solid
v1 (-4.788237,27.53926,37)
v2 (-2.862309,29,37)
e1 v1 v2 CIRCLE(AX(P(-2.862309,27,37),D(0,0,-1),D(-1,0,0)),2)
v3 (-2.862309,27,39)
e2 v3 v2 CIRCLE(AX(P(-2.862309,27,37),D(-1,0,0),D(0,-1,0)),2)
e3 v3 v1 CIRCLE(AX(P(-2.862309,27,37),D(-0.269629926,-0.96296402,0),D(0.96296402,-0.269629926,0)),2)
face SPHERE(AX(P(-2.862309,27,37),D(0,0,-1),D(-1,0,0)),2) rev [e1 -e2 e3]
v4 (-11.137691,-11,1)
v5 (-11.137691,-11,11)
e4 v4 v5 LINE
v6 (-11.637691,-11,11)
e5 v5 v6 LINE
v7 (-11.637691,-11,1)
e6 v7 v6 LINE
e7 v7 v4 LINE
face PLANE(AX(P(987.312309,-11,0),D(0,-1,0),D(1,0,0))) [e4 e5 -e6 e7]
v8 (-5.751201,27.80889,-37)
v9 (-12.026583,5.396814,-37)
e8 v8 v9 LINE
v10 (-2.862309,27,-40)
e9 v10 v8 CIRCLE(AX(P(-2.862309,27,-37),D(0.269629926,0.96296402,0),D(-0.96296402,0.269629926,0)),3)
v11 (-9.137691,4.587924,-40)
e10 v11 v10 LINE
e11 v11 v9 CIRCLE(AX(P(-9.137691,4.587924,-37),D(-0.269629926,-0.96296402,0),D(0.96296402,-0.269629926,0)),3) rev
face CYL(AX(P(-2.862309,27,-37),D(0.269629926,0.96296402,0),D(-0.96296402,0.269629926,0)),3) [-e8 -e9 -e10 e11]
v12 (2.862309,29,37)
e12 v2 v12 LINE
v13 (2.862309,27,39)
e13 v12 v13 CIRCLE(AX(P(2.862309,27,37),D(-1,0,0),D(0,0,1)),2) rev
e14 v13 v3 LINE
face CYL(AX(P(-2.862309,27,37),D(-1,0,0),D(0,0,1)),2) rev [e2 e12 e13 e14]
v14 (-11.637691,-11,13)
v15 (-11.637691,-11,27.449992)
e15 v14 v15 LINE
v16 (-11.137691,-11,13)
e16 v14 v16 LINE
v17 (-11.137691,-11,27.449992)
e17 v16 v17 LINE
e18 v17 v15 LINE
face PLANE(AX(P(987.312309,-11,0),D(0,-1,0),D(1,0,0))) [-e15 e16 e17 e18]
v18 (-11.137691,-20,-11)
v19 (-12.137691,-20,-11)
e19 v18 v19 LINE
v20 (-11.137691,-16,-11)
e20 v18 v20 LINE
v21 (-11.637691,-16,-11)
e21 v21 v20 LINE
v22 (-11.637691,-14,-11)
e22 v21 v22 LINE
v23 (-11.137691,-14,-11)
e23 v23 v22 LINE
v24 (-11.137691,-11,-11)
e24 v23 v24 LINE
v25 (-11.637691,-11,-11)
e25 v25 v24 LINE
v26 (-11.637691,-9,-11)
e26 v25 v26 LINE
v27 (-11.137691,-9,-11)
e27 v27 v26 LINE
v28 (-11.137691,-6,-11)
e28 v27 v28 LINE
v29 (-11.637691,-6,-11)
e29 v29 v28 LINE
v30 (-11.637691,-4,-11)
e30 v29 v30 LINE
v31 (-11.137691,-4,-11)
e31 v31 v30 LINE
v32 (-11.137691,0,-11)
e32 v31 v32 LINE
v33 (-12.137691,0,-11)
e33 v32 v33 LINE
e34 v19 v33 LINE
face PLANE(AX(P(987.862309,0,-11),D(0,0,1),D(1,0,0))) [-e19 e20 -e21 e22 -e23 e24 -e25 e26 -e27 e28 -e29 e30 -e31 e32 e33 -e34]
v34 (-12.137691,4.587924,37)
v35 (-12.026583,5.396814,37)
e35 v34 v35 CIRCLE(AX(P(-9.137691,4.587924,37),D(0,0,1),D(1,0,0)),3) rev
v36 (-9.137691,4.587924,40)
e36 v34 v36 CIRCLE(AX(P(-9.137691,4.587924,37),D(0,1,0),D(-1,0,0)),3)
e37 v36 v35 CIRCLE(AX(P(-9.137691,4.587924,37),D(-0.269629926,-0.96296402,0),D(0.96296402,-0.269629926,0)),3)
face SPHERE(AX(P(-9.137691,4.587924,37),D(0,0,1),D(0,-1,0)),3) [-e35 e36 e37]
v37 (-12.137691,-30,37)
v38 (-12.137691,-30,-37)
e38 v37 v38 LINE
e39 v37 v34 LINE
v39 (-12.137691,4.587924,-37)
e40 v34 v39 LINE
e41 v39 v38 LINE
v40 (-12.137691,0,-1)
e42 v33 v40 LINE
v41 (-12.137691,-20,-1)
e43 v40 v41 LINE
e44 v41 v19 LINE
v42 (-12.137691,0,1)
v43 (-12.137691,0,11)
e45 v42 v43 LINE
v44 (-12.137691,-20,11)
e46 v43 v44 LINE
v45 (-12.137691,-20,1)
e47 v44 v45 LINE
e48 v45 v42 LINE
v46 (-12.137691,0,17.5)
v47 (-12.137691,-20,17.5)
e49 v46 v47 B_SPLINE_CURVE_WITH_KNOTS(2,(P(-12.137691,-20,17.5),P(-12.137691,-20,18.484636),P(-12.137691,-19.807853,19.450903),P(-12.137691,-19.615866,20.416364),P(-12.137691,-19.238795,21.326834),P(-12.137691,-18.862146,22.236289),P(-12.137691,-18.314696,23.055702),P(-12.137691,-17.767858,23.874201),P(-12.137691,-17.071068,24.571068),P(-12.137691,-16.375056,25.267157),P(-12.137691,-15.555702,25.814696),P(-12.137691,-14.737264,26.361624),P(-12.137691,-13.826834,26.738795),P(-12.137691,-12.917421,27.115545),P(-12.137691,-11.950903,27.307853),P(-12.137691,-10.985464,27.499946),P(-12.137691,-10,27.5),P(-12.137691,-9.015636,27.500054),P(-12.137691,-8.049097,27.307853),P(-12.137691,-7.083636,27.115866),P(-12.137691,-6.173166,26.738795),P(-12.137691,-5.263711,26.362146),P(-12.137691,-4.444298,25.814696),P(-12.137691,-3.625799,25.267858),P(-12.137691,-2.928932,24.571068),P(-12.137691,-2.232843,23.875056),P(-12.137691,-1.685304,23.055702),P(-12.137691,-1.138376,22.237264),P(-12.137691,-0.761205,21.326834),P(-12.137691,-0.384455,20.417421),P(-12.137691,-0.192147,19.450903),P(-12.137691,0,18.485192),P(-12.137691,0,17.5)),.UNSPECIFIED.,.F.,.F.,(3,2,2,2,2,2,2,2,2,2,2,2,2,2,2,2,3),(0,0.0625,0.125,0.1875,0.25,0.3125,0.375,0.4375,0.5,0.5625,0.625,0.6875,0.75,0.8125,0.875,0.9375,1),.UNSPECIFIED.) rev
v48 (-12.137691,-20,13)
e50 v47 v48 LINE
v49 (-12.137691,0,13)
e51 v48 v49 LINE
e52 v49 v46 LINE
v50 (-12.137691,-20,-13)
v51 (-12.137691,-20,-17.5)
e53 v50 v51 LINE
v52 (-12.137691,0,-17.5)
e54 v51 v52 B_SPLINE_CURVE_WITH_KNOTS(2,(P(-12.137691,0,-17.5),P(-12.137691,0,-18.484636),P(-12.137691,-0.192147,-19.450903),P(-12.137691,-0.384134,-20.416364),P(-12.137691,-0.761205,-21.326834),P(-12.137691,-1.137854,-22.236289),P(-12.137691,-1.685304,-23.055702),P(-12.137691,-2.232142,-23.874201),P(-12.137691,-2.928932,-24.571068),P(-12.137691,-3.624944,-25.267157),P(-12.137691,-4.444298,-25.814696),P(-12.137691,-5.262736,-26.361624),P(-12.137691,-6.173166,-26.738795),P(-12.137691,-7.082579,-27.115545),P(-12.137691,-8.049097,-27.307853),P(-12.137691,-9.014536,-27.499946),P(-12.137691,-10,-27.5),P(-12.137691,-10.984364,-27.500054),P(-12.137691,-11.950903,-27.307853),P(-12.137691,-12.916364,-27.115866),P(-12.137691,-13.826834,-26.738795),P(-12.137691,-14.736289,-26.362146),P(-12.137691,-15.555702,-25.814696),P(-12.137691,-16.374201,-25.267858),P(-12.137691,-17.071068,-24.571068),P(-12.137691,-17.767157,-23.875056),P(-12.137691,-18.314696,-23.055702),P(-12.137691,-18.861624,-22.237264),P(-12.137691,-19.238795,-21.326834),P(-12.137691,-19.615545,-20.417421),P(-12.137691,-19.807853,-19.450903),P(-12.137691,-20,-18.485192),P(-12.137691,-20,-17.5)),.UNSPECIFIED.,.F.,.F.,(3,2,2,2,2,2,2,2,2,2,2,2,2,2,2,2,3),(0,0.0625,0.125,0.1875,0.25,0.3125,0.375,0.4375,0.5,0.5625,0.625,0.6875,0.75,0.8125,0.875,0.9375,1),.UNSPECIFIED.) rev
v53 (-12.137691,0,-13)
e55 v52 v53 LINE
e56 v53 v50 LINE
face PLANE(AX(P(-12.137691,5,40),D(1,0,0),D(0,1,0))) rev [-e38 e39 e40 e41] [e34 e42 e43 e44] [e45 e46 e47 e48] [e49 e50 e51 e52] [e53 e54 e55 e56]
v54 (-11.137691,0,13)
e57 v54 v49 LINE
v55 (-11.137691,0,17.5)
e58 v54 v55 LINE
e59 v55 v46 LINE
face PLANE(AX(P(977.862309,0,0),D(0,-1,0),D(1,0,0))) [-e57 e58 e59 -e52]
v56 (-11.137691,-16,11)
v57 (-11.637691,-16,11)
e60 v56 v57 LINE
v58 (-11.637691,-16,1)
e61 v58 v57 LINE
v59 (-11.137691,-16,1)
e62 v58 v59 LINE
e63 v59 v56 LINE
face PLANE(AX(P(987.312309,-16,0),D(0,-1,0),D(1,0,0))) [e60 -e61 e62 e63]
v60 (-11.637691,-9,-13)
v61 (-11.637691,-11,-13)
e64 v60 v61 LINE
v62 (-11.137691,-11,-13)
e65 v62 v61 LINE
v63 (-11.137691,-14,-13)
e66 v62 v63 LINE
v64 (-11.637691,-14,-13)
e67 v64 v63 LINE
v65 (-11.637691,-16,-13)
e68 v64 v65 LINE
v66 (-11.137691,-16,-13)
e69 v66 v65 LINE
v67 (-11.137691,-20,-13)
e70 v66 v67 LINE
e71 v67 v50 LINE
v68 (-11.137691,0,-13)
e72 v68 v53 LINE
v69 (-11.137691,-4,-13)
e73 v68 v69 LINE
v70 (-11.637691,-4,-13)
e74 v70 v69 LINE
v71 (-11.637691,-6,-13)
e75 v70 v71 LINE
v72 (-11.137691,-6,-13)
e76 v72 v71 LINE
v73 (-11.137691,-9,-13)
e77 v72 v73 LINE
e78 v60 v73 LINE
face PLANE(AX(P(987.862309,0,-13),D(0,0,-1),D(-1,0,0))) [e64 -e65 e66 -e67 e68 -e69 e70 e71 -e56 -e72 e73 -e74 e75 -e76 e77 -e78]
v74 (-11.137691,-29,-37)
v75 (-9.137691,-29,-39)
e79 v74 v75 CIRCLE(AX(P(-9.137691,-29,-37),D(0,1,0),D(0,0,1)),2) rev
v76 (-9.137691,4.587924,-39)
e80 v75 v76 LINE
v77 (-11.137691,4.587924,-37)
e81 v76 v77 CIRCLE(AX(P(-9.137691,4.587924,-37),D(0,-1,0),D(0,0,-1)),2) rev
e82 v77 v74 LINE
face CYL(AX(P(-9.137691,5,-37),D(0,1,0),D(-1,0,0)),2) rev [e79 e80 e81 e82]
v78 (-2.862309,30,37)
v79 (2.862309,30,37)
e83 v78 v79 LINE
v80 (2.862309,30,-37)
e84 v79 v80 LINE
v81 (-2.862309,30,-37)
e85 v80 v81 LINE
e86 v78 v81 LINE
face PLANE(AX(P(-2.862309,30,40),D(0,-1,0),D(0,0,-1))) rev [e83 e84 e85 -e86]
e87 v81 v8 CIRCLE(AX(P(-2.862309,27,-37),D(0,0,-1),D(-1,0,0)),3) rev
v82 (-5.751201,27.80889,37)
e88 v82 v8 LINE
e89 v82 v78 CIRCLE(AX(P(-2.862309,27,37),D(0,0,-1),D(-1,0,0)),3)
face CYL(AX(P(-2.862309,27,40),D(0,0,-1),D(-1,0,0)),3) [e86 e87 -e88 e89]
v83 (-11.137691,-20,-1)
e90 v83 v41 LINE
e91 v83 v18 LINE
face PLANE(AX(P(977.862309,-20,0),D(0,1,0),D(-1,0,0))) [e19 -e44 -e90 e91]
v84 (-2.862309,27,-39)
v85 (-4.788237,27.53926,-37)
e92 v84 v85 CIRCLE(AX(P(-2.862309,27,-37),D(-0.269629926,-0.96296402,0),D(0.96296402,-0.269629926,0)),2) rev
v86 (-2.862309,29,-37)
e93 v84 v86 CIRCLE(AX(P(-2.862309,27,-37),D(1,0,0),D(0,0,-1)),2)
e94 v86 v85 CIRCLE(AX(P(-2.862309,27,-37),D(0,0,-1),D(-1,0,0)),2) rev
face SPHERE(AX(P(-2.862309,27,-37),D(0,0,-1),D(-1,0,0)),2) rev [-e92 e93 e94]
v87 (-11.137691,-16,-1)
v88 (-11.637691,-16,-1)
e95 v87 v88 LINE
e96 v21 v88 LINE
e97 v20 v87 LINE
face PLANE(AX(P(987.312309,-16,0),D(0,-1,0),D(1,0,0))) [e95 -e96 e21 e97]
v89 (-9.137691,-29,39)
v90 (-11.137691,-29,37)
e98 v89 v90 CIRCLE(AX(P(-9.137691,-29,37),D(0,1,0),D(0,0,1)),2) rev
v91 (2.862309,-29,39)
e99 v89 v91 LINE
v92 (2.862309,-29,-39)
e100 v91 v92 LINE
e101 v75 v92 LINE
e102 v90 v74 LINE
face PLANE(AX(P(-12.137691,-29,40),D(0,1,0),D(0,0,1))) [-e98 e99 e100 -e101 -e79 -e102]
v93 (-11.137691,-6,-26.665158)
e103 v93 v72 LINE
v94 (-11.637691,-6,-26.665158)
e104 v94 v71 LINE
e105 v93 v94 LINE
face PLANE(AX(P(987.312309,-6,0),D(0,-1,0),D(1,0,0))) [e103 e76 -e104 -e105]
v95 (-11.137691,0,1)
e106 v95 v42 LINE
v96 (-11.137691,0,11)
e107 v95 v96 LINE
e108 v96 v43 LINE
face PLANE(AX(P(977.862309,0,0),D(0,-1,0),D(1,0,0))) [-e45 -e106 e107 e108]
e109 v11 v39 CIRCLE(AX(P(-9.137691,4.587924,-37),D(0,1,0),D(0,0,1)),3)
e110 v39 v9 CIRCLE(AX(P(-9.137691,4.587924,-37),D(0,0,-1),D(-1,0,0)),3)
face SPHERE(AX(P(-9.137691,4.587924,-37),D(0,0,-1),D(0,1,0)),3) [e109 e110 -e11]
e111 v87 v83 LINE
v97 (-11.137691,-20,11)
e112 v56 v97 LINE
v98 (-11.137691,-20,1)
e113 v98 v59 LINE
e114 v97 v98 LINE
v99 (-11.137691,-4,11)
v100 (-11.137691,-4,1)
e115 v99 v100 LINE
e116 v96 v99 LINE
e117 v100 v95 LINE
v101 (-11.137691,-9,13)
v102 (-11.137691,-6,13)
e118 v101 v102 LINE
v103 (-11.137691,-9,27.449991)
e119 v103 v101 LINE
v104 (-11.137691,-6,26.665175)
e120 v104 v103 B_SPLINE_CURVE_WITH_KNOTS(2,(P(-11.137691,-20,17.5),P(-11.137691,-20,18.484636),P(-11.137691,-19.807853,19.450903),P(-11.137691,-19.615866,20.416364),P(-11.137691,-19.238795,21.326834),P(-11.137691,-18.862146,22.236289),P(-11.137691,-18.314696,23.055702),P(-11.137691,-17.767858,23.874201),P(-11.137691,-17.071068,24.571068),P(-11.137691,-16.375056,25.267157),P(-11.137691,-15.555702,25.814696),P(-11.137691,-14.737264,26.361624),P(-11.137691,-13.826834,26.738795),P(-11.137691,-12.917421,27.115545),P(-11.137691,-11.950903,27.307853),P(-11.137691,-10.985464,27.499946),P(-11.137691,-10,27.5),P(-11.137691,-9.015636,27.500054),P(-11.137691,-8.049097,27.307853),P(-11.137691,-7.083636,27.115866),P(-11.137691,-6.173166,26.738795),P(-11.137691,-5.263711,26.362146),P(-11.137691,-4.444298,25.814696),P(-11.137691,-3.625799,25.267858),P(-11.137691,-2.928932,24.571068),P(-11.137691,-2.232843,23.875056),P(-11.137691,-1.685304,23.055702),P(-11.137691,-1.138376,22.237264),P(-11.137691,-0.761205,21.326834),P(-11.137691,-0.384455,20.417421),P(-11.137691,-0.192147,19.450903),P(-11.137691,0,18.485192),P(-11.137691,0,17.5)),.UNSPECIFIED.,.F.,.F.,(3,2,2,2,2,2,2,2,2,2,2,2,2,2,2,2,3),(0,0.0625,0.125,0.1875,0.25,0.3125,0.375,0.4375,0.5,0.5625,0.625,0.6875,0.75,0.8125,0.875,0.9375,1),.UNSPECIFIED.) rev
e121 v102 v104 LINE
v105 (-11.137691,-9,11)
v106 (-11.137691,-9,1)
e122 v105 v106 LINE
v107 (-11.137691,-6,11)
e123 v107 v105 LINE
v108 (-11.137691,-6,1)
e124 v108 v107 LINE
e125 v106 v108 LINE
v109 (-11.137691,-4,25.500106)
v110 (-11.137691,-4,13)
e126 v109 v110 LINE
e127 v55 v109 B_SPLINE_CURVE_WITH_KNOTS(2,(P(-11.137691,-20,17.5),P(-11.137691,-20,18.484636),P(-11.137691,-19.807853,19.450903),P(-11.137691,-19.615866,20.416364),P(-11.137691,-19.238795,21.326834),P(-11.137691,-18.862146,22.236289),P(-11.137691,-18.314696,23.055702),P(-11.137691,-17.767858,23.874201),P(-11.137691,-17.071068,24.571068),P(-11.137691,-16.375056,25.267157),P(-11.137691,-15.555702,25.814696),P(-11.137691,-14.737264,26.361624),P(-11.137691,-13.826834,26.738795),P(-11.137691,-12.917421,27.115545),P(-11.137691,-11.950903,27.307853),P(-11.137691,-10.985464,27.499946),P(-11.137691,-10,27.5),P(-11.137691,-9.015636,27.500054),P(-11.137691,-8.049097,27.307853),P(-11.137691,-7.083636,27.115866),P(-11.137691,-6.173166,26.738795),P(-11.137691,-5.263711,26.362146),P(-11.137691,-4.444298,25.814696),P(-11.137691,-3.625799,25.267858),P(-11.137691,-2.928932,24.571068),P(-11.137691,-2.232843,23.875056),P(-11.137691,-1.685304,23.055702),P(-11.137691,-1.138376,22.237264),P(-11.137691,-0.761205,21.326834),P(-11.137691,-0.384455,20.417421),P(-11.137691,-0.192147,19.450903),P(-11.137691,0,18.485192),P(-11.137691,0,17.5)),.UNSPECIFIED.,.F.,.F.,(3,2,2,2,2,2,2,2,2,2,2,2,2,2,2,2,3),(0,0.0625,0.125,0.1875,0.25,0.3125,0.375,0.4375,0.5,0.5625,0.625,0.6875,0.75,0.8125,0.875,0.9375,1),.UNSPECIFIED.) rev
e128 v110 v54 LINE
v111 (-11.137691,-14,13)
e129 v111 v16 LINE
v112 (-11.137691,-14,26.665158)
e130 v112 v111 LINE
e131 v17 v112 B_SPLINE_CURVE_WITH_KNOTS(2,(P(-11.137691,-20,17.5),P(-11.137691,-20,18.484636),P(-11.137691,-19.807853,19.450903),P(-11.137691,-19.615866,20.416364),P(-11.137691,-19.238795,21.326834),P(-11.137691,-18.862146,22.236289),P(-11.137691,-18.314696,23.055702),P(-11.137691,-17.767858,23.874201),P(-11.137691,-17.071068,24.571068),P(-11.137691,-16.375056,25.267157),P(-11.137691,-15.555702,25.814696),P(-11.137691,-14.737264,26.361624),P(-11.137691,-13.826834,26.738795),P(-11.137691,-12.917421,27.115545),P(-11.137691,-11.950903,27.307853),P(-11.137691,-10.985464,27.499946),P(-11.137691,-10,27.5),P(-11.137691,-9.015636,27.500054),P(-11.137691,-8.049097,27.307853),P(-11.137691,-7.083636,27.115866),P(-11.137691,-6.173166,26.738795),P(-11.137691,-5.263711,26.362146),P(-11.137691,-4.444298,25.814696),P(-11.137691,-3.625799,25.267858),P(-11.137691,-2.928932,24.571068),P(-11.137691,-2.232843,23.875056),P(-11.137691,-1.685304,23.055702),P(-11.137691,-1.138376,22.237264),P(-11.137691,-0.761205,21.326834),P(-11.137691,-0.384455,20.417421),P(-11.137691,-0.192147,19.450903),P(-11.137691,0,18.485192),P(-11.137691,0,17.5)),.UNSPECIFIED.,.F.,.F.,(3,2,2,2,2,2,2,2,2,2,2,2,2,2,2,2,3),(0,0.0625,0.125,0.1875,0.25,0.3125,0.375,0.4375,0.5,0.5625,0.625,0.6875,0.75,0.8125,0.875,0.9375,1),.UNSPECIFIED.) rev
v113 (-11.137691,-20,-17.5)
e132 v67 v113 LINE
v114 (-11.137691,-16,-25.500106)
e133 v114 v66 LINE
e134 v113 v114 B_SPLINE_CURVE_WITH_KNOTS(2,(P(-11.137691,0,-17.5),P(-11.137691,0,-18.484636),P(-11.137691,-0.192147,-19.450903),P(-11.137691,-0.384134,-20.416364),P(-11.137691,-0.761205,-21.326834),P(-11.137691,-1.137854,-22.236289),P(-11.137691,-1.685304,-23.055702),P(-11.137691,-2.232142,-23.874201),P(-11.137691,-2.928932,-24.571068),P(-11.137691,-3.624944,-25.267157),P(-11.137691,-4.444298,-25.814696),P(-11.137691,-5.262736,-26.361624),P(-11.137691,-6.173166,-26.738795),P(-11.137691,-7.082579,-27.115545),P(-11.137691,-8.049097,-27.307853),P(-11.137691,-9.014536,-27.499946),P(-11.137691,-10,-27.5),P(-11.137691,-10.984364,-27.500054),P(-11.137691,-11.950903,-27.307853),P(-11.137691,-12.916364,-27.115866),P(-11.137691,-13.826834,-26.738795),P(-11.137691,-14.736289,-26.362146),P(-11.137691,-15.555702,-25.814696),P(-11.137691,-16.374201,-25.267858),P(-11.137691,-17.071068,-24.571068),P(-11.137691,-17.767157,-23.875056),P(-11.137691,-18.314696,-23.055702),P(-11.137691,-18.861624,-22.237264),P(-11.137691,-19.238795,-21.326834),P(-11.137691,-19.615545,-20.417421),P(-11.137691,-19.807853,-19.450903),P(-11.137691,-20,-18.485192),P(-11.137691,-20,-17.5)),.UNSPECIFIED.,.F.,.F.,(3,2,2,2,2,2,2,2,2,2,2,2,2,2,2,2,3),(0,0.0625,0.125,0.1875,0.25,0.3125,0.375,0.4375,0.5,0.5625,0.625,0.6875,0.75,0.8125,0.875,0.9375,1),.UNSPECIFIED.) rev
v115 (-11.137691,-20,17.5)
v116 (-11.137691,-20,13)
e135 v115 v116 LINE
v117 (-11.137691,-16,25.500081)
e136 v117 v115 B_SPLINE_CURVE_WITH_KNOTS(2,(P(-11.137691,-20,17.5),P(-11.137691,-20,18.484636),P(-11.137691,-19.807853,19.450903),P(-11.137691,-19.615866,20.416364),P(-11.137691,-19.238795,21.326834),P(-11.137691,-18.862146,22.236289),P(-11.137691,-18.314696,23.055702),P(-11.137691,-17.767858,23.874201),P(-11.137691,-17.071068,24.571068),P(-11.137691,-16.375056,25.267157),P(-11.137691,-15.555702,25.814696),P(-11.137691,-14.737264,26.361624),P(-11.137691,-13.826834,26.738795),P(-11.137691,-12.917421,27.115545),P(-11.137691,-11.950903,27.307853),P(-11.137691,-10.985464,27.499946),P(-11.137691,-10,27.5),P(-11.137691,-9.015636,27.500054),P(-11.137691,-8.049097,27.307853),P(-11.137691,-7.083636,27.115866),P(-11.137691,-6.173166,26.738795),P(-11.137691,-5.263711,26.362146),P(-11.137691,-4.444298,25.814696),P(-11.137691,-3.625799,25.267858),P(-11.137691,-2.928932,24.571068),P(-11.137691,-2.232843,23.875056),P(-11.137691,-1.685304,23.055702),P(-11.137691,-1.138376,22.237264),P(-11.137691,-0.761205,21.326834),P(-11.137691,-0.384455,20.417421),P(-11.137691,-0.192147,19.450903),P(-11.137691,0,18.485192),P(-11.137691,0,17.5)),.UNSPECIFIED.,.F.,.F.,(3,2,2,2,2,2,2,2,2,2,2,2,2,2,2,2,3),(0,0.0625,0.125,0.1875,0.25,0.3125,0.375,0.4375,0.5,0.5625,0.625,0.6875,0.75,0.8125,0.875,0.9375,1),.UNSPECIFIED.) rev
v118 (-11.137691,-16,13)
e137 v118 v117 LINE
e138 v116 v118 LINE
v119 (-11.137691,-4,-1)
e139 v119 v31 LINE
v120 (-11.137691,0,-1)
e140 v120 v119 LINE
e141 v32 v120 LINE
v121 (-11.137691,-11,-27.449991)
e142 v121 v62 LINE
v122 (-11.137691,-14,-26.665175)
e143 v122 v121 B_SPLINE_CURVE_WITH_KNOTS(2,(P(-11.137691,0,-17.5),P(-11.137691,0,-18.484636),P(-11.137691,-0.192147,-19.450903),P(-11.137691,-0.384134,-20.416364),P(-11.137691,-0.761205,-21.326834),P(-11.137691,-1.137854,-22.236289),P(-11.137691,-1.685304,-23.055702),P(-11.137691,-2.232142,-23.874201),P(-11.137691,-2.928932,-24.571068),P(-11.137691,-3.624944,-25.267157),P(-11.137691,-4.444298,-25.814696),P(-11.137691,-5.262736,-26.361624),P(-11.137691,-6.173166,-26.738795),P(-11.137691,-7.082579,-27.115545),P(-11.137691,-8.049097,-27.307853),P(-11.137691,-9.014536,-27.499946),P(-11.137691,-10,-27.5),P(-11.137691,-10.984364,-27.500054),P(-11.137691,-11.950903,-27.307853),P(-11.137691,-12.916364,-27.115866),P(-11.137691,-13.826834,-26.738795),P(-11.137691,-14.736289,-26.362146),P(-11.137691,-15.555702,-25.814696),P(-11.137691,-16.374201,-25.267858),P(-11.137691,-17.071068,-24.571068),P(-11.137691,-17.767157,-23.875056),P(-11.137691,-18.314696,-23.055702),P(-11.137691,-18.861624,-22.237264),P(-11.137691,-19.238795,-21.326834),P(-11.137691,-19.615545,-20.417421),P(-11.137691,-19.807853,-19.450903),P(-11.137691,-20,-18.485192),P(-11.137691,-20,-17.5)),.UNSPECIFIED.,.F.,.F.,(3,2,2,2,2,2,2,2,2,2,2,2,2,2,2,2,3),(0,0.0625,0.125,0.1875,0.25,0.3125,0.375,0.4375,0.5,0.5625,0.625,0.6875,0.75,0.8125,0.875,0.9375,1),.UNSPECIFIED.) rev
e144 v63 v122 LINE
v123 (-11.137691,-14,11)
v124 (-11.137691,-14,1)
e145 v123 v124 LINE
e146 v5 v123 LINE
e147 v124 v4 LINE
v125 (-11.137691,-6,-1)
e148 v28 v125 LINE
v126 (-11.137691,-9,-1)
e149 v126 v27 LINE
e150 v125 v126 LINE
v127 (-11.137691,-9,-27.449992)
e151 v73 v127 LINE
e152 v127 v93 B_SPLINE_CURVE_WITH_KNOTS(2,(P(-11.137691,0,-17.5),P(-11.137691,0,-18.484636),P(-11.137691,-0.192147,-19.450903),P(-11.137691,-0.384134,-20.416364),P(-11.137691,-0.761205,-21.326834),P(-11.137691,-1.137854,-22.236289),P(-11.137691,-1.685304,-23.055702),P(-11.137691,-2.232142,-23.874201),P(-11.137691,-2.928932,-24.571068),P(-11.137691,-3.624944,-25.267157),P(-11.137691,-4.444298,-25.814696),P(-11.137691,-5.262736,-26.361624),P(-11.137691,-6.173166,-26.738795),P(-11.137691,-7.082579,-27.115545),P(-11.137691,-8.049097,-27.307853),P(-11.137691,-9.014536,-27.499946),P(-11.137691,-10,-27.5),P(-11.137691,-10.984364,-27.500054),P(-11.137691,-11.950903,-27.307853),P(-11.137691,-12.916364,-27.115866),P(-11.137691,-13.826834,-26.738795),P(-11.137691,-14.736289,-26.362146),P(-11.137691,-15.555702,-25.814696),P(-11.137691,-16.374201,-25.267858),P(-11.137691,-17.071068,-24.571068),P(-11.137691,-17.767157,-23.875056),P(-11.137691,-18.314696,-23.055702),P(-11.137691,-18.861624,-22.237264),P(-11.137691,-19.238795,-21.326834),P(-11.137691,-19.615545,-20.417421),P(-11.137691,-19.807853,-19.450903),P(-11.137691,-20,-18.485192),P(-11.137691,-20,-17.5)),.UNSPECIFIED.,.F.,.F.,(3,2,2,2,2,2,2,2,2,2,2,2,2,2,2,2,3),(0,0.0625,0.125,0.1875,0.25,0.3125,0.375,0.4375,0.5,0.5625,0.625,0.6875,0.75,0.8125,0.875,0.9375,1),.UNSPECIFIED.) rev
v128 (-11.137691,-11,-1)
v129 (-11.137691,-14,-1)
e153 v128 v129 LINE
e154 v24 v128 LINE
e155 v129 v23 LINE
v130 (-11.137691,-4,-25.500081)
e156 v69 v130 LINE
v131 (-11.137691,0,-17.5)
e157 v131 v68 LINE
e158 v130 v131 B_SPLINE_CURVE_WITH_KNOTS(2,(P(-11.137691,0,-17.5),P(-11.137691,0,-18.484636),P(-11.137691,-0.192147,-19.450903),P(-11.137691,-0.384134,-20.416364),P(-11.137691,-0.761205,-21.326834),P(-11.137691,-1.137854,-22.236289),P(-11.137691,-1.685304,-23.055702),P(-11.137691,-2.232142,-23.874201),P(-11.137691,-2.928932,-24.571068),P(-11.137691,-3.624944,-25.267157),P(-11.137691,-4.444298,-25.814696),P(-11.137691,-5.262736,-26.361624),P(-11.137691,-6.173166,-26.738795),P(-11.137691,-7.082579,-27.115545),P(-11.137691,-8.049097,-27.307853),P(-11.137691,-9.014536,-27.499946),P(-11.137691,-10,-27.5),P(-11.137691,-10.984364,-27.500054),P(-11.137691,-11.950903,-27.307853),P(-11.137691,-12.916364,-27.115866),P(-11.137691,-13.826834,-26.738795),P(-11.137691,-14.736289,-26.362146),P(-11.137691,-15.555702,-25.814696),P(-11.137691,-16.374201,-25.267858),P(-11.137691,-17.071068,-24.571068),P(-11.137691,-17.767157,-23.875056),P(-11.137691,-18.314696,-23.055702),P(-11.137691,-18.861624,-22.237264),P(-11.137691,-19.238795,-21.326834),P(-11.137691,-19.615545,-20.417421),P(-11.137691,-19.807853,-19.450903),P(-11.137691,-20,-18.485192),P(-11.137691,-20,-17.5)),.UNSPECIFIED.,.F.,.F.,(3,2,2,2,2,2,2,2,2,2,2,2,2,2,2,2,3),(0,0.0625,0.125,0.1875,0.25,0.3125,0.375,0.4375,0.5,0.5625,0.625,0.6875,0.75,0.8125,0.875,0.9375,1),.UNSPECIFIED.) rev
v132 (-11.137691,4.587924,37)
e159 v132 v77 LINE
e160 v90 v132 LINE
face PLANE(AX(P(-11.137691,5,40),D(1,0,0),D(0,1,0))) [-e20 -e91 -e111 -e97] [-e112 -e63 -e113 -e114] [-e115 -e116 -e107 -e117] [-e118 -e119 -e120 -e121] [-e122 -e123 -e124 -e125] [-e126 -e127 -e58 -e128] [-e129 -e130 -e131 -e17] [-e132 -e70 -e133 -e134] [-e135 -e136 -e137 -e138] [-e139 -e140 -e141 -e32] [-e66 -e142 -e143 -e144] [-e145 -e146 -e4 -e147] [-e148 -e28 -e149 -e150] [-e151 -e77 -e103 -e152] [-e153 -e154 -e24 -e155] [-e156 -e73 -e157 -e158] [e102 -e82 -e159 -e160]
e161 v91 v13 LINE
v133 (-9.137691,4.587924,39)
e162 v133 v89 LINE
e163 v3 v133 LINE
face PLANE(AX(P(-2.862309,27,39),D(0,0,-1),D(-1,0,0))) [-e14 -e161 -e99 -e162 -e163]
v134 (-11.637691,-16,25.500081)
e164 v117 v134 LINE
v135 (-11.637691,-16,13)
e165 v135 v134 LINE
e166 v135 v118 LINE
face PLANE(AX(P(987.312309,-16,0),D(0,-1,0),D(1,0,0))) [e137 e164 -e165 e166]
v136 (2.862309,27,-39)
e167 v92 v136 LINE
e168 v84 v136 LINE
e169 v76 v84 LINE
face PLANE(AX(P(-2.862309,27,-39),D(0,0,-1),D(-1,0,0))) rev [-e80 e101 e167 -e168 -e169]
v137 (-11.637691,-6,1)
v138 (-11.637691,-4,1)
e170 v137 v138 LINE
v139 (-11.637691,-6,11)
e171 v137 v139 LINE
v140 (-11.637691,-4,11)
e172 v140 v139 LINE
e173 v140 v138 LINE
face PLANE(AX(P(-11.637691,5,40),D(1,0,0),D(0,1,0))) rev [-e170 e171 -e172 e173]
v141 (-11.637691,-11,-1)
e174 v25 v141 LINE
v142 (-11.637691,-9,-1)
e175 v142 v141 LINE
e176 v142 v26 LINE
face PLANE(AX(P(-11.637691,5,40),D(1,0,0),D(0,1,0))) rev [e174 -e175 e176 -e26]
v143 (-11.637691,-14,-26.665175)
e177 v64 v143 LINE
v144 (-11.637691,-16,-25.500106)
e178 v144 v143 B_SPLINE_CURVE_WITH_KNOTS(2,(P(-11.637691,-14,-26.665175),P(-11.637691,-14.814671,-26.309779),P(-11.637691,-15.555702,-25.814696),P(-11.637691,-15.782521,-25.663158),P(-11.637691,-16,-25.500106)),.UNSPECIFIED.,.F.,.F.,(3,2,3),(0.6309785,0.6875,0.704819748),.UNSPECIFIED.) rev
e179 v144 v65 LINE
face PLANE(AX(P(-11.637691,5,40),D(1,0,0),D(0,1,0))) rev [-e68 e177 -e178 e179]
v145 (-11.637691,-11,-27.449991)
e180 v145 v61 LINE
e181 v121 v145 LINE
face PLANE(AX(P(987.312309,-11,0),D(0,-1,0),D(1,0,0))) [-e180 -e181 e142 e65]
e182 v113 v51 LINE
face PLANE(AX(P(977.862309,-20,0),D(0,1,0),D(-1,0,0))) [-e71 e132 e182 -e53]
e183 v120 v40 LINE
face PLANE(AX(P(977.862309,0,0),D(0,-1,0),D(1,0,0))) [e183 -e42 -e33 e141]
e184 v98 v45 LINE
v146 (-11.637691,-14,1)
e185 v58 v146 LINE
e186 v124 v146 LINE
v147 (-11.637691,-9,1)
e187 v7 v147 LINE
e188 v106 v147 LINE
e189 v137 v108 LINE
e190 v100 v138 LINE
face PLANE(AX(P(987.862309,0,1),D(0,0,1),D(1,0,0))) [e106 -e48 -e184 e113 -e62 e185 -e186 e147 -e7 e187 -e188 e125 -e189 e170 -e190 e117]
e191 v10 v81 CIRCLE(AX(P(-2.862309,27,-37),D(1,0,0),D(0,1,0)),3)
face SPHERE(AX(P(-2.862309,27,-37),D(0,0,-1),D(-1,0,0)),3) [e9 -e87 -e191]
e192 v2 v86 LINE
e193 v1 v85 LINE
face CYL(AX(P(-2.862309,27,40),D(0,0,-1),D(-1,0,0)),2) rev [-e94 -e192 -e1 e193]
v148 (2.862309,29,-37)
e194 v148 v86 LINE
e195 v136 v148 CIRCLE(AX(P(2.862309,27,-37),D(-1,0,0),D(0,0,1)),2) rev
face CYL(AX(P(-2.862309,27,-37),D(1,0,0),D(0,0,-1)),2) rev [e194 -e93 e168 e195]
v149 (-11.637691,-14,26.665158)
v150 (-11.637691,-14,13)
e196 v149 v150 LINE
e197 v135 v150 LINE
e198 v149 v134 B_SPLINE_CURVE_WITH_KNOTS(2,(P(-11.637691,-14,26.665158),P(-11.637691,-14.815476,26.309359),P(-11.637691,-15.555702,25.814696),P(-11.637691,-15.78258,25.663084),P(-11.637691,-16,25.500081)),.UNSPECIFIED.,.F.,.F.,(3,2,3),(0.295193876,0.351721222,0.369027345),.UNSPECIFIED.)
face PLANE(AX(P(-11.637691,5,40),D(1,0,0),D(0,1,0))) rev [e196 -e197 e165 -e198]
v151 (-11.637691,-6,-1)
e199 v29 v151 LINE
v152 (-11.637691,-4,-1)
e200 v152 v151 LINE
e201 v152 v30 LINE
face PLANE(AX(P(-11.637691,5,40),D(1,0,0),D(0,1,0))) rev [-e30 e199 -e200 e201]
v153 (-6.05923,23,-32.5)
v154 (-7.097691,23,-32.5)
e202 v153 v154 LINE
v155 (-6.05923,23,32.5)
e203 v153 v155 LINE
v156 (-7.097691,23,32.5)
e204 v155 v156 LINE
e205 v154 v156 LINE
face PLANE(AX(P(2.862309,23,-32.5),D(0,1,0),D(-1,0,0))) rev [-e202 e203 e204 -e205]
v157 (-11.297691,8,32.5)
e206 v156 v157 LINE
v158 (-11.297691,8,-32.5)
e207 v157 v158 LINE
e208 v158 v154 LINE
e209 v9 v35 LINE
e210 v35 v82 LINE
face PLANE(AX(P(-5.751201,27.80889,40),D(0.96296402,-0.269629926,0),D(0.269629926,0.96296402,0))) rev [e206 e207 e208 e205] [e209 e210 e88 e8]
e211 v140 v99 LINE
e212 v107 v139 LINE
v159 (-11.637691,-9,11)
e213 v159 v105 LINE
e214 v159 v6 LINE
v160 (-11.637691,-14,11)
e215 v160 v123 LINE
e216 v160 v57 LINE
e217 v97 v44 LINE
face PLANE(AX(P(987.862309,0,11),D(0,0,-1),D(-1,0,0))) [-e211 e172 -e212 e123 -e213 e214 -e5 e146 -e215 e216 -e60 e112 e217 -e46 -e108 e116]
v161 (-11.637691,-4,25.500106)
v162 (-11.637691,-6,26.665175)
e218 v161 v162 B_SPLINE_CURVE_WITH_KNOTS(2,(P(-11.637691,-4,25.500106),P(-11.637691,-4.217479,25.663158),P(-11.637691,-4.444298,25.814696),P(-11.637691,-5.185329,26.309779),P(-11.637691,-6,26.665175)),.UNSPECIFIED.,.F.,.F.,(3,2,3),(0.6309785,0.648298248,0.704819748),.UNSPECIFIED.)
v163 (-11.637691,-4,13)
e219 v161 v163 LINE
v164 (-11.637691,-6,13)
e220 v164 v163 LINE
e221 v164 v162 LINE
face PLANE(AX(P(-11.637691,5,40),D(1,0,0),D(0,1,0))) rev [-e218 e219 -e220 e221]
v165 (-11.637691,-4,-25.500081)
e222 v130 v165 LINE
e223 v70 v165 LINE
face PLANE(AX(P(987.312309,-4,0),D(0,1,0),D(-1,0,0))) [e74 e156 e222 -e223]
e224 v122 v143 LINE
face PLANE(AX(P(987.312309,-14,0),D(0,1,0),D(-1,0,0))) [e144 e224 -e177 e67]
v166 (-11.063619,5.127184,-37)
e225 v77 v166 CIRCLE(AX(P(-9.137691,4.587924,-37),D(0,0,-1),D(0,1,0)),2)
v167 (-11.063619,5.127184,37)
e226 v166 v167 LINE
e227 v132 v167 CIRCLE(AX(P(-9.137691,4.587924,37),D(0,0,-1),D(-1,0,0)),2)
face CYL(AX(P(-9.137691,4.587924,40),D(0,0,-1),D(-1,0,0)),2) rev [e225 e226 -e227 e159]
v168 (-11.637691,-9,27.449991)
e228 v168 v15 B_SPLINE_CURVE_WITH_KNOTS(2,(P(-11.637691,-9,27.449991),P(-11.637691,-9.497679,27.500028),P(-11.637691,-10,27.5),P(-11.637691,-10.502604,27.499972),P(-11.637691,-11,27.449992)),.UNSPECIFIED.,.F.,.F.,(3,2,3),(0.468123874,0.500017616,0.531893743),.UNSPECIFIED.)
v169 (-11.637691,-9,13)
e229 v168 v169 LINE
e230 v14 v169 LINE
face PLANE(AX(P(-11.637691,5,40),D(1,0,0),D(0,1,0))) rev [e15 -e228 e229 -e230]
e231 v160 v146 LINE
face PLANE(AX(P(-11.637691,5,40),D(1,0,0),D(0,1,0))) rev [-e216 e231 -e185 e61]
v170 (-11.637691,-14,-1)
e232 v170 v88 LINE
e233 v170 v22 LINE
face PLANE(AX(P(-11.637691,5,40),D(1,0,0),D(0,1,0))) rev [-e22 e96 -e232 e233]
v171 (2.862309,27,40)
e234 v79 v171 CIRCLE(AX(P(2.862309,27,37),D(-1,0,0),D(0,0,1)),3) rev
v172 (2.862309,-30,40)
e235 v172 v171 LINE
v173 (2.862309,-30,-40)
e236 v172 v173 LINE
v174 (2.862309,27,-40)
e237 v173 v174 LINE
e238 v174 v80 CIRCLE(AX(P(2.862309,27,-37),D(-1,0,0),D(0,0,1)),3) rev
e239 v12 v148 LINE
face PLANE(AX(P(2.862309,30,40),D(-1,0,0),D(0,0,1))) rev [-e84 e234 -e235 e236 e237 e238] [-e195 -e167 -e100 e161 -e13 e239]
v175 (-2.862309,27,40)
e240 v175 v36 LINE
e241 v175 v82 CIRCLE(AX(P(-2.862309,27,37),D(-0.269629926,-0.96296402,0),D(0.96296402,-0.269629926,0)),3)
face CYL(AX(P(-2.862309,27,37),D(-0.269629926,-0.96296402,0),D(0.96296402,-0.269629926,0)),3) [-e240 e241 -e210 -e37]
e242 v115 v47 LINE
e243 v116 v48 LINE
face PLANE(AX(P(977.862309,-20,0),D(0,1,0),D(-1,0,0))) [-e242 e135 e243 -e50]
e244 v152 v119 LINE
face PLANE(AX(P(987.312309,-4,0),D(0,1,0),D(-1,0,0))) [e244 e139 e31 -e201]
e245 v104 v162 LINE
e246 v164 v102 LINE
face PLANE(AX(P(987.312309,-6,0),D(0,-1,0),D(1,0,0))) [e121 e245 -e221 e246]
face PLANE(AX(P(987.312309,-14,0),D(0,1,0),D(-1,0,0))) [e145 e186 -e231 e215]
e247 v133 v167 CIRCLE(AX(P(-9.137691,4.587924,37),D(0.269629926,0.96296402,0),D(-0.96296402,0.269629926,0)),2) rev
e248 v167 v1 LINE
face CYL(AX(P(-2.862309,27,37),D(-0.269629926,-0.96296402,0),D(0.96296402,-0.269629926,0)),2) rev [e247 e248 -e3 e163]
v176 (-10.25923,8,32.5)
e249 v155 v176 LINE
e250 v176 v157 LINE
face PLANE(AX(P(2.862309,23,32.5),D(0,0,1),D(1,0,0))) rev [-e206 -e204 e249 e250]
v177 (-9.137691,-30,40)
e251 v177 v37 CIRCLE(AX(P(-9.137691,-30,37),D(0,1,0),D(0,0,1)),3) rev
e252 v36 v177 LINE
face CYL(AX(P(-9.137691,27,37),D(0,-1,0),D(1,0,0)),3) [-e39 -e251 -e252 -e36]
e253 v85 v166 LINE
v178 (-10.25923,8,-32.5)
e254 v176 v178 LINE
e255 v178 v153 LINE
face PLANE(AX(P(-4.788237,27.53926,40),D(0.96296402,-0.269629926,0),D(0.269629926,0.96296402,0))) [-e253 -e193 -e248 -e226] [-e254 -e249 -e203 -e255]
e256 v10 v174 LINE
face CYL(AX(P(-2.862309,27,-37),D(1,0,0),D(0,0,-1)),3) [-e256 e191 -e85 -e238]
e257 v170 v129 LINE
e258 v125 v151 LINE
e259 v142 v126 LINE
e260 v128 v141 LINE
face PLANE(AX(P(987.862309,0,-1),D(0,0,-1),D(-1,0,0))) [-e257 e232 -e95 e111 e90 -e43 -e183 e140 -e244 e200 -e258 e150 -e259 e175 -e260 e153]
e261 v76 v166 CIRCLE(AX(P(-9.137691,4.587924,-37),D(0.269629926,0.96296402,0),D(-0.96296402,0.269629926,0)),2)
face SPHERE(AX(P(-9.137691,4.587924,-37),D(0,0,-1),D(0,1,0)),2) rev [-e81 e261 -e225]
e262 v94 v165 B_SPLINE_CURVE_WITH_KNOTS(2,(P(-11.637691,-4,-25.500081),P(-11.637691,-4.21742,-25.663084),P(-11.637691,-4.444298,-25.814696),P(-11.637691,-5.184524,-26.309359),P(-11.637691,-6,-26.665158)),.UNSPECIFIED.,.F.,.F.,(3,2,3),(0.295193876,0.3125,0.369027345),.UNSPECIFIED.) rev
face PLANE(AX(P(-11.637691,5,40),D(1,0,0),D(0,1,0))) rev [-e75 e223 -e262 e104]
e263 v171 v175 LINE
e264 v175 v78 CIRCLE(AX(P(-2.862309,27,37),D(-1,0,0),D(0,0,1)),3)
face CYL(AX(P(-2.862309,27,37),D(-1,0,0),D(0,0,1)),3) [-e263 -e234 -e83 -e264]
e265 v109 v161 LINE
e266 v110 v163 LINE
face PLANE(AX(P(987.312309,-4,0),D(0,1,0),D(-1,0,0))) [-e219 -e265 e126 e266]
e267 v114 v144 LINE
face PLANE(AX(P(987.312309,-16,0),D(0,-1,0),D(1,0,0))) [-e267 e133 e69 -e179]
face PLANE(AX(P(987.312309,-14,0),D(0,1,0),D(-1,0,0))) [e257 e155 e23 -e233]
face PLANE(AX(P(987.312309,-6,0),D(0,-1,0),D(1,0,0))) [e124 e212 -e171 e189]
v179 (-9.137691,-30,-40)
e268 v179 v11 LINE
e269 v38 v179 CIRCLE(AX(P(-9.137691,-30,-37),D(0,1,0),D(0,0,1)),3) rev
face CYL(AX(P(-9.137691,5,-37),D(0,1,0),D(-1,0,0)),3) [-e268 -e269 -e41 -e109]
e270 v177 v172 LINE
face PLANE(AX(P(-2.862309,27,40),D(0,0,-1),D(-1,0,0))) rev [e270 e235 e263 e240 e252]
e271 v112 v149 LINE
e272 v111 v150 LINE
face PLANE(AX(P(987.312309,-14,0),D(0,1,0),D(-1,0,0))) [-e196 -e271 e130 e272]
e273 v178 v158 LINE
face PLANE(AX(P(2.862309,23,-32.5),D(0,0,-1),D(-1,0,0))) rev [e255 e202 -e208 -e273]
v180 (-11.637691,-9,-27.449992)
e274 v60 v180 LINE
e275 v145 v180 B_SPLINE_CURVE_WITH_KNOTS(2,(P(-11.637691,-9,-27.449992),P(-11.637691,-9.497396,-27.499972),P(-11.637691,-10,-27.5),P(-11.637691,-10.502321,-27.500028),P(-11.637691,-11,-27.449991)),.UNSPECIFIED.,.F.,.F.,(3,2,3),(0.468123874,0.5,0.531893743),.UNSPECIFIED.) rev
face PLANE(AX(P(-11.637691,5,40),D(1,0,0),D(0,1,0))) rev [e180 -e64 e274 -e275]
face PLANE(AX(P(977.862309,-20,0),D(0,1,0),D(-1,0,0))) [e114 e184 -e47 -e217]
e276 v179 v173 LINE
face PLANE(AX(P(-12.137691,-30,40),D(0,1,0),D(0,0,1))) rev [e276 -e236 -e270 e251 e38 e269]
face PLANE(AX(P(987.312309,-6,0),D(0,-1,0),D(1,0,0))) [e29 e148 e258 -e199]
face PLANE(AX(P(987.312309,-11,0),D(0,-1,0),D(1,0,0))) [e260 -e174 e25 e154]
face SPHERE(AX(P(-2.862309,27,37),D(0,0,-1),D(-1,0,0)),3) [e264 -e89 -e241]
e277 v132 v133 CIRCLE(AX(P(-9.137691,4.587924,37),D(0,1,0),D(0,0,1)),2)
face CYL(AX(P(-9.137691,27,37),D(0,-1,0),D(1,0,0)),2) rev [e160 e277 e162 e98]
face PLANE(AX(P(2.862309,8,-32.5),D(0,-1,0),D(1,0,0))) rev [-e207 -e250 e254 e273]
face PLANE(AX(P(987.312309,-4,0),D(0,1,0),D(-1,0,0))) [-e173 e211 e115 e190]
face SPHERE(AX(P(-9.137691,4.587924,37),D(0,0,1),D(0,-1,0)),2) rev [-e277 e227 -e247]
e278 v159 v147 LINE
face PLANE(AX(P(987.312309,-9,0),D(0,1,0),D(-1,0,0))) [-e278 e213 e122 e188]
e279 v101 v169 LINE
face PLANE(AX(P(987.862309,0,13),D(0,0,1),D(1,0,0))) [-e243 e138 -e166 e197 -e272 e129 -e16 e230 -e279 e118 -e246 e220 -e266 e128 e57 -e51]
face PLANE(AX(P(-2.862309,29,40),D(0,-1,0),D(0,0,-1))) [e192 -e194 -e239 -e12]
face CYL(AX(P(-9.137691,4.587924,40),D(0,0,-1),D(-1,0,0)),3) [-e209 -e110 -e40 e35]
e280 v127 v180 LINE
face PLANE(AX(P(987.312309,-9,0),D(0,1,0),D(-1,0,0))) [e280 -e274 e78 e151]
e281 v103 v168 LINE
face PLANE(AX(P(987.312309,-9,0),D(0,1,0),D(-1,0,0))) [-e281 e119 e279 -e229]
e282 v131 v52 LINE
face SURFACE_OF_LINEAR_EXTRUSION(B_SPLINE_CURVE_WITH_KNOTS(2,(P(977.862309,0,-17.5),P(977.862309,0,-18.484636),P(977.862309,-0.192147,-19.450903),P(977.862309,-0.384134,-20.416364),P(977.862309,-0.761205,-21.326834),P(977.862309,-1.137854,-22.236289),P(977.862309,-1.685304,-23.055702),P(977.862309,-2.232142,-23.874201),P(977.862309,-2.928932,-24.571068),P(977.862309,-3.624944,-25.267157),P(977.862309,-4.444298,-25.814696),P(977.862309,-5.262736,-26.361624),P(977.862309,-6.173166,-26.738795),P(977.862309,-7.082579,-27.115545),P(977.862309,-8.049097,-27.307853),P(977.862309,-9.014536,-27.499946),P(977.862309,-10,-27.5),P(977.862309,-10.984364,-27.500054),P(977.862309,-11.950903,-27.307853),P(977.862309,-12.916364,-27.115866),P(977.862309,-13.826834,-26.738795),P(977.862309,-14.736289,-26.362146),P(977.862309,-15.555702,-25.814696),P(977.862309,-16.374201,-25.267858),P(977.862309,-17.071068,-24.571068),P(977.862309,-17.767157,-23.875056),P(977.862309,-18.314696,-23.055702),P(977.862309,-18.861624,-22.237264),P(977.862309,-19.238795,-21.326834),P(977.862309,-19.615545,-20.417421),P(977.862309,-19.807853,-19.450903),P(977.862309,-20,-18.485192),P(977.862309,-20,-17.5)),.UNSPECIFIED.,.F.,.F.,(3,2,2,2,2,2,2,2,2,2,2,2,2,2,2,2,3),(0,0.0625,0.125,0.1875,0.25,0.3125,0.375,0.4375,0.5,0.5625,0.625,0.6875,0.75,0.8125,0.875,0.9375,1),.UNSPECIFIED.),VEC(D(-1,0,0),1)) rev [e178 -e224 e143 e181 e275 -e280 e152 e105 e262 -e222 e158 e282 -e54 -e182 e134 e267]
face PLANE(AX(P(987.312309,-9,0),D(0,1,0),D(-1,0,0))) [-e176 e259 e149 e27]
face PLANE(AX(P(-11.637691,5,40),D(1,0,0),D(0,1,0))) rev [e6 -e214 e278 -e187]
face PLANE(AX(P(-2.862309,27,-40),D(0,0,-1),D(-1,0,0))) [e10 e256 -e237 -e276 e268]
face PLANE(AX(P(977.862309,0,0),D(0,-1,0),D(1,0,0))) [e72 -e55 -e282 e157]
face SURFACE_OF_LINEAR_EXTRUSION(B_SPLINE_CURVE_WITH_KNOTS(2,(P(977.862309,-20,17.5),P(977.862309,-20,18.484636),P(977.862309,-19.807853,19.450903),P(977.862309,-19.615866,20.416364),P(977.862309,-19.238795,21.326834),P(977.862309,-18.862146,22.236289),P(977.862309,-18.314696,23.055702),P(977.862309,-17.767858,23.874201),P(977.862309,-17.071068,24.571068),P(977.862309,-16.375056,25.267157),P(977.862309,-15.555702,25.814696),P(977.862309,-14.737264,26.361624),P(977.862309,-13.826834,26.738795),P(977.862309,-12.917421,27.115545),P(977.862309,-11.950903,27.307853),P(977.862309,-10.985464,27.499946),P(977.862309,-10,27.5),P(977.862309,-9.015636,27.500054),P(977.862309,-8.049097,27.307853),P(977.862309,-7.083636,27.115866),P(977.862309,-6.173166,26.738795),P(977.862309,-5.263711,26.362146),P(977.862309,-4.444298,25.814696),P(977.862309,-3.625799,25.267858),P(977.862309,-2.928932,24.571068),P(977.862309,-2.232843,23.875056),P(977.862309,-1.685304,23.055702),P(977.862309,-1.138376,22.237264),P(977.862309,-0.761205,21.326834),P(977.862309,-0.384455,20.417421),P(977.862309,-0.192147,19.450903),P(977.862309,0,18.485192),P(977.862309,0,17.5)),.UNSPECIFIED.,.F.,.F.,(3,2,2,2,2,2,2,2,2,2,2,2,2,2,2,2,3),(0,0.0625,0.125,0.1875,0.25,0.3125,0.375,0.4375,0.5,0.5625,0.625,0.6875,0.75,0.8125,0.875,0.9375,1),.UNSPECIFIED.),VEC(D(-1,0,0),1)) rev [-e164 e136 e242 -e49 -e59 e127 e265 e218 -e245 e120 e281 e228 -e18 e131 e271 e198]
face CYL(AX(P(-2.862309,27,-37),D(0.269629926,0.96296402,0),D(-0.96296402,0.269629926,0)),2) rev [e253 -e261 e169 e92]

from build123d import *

# Parameters (mm, degrees)
BOSS_EXTRUDE1_DEPTH = 40
FILLET1_R           = 3
SHELL1_T            = -1
SKETCH2_W           = 65
SKETCH2_H           = 15
CUT_EXTRUDE1_DEPTH  = 53.201532545
VENT1_START         = -12.137690598
VENT1_OUTLINE_W     = 4
VENT1_OUTLINE_H     = 10
VENT1_OUTLINE_W_2   = 3
VENT1_DEPTH         = 1
VENT1_2_OUTLINE_W   = 2
VENT1_2_OUTLINE_H   = 10
VENT1_2_DEPTH       = 0.5


# Read off the part's stored shape, not the designer's step: Vent1
with BuildPart() as part:
    # Sketch1 → Boss-Extrude1 (new, symmetric)
    with BuildSketch(Plane.XY):
        with BuildLine():
            Line((-5.751201461, 27.808889777), (-12.137690598, 5))
            Line((-12.137690598, 5), (-12.137690598, -30))
            Line((-12.137690598, -30), (2.862309402, -30))
            Line((2.862309402, -30), (2.862309402, 30))
            Line((2.862309402, 30), (-2.862309402, 30))
            ThreePointArc((-2.862309402, 30), (-4.675225653, 29.390258284), (-5.751201461, 27.808889777))
        make_face()
    extrude(amount=BOSS_EXTRUDE1_DEPTH, both=True)

    # Fillet1
    fillet1_edges = [part.edges().sort_by_distance(p)[0] for p in [
        (-12.137690598, 5, 0),
        (-4.675225653, 29.390258284, 40),
        (-8.94444603, 16.404444888, 40),
        (-12.137690598, -12.5, 40),
        (-12.137690598, -12.5, -40),
        (-8.94444603, 16.404444888, -40),
        (-4.675225653, 29.390258284, -40),
        (0, 30, -40),
        (0, 30, 40),
    ]]
    fillet(fillet1_edges, radius=FILLET1_R)

    # Shell1
    shell1_openings = [part.faces().sort_by_distance(p)[0] for p in [
        (2.862309402, -0.023622446, 0),
    ]]
    offset(amount=SHELL1_T, openings=shell1_openings, kind=Kind.INTERSECTION)

    # Sketch2 → Cut-Extrude1 (cut, through all)
    with BuildSketch(Plane.ZY.offset(12.137690598)):
        with Locations((0, 15.5)):
            Rectangle(SKETCH2_W, SKETCH2_H)
    extrude(amount=-CUT_EXTRUDE1_DEPTH, mode=Mode.SUBTRACT)

    # Vent1 outline → Vent1 (cut)
    with BuildSketch(Plane.YZ.offset(VENT1_START)):
        with BuildLine():
            add(Edge.make_bspline(
                [(-20, 17.5), (-20, 18.484636289), (-19.807852804, 19.45090322), (-19.615866008, 20.416363534), (-19.238795325, 21.326834324), (-18.862145538, 22.236288823), (-18.314696123, 23.05570233), (-17.767857785, 23.874201188), (-17.071067812, 24.571067812), (-16.567779985, 25.074411003), (-16, 25.500081295)],
                knots=[0, 0, 0, 0.0625, 0.0625, 0.125, 0.125, 0.1875, 0.1875, 0.25, 0.25, 0.295193876, 0.295193876, 0.295193876], degree=2))
            Line((-20, 17.5), (-20, 13))
            Line((-20, 13), (-16, 13))
            Line((-16, 13), (-16, 25.500081295))
        make_face()
        with BuildLine():
            add(Edge.make_bspline(
                [(-14, 26.665158313), (-13.9138372, 26.702751948), (-13.826834324, 26.738795325), (-12.917421262, 27.11554515), (-11.95090322, 27.307852804), (-11.477855415, 27.40197491), (-11, 27.449991893)],
                knots=[0.369027345, 0.369027345, 0.369027345, 0.375, 0.375, 0.4375, 0.4375, 0.468123874, 0.468123874, 0.468123874], degree=2))
            Line((-14, 26.665158313), (-14, 13))
            Line((-14, 13), (-11, 13))
            Line((-11, 13), (-11, 27.449991893))
        make_face()
        with BuildLine():
            add(Edge.make_bspline(
                [(-9, 27.449990782), (-8.522411136, 27.401973821), (-8.04909678, 27.307852804), (-7.083636466, 27.115866008), (-6.173165676, 26.738795325), (-6.086170897, 26.702766513), (-6, 26.665174873)],
                knots=[0.531893743, 0.531893743, 0.531893743, 0.5625, 0.5625, 0.625, 0.625, 0.6309785, 0.6309785, 0.6309785], degree=2))
            Line((-9, 27.449990782), (-9, 13))
            Line((-9, 13), (-6, 13))
            Line((-6, 13), (-6, 26.665174873))
        make_face()
        with BuildLine():
            add(Edge.make_bspline(
                [(-4, 25.500105578), (-3.432685944, 25.074766157), (-2.928932188, 24.571067812), (-2.232843424, 23.875055613), (-1.685303877, 23.05570233), (-1.138375507, 22.23726363), (-0.761204675, 21.326834324), (-0.38445485, 20.417421262), (-0.192147196, 19.45090322), (0, 18.485191624), (0, 17.5)],
                knots=[0.704819748, 0.704819748, 0.704819748, 0.75, 0.75, 0.8125, 0.8125, 0.875, 0.875, 0.9375, 0.9375, 1, 1, 1], degree=2))
            Line((-4, 25.500105578), (-4, 13))
            Line((-4, 13), (0, 13))
            Line((0, 13), (0, 17.5))
        make_face()
        with BuildLine():
            add(Edge.make_bspline(
                [(0, -17.5), (0, -18.484636289), (-0.192147196, -19.45090322), (-0.384133992, -20.416363534), (-0.761204675, -21.326834324), (-1.137854462, -22.236288823), (-1.685303877, -23.05570233), (-2.232142215, -23.874201188), (-2.928932188, -24.571067812), (-3.432220015, -25.074411003), (-4, -25.500081295)],
                knots=[0, 0, 0, 0.0625, 0.0625, 0.125, 0.125, 0.1875, 0.1875, 0.25, 0.25, 0.295193876, 0.295193876, 0.295193876], degree=2))
            Line((0, -17.5), (0, -13))
            Line((0, -13), (-4, -13))
            Line((-4, -13), (-4, -25.500081295))
        make_face()
        with BuildLine():
            add(Edge.make_bspline(
                [(-6, -26.665158313), (-6.086162801, -26.702751948), (-6.173165676, -26.738795325), (-7.082578738, -27.11554515), (-8.04909678, -27.307852804), (-8.522144585, -27.40197491), (-9, -27.449991893)],
                knots=[0.369027345, 0.369027345, 0.369027345, 0.375, 0.375, 0.4375, 0.4375, 0.468123874, 0.468123874, 0.468123874], degree=2))
            Line((-6, -26.665158313), (-6, -13))
            Line((-6, -13), (-9, -13))
            Line((-9, -13), (-9, -27.449991893))
        make_face()
        with BuildLine():
            add(Edge.make_bspline(
                [(-11, -27.449990782), (-11.477588864, -27.401973821), (-11.95090322, -27.307852804), (-12.916363534, -27.115866008), (-13.826834324, -26.738795325), (-13.913829103, -26.702766513), (-14, -26.665174873)],
                knots=[0.531893743, 0.531893743, 0.531893743, 0.5625, 0.5625, 0.625, 0.625, 0.6309785, 0.6309785, 0.6309785], degree=2))
            Line((-11, -27.449990782), (-11, -13))
            Line((-11, -13), (-14, -13))
            Line((-14, -13), (-14, -26.665174873))
        make_face()
        with BuildLine():
            add(Edge.make_bspline(
                [(-16, -25.500105578), (-16.567314056, -25.074766157), (-17.071067812, -24.571067812), (-17.767156576, -23.875055613), (-18.314696123, -23.05570233), (-18.861624493, -22.23726363), (-19.238795325, -21.326834324), (-19.61554515, -20.417421262), (-19.807852804, -19.45090322), (-20, -18.485191624), (-20, -17.5)],
                knots=[0.704819748, 0.704819748, 0.704819748, 0.75, 0.75, 0.8125, 0.8125, 0.875, 0.875, 0.9375, 0.9375, 1, 1, 1], degree=2))
            Line((-16, -25.500105578), (-16, -13))
            Line((-16, -13), (-20, -13))
            Line((-20, -13), (-20, -17.5))
        make_face()
        with Locations((-2, -6)):
            Rectangle(VENT1_OUTLINE_W, VENT1_OUTLINE_H)
        with Locations((-7.5, -6)):
            Rectangle(VENT1_OUTLINE_W_2, VENT1_OUTLINE_H)
        with Locations((-12.5, -6)):
            Rectangle(VENT1_OUTLINE_W_2, VENT1_OUTLINE_H)
        with Locations((-18, -6)):
            Rectangle(VENT1_OUTLINE_W, VENT1_OUTLINE_H)
        with Locations((-2, 6)):
            Rectangle(VENT1_OUTLINE_W, VENT1_OUTLINE_H)
        with Locations((-7.5, 6)):
            Rectangle(VENT1_OUTLINE_W_2, VENT1_OUTLINE_H)
        with Locations((-12.5, 6)):
            Rectangle(VENT1_OUTLINE_W_2, VENT1_OUTLINE_H)
        with Locations((-18, 6)):
            Rectangle(VENT1_OUTLINE_W, VENT1_OUTLINE_H)
    extrude(amount=VENT1_DEPTH, mode=Mode.SUBTRACT)

    # Vent1 2 outline → Vent1 2 (cut)
    with BuildSketch(Plane.YZ.offset(VENT1_START)):
        with BuildLine():
            add(Edge.make_bspline(
                [(-16, 25.500081295), (-15.782579599, 25.663083528), (-15.55570233, 25.814696123), (-14.815475656, 26.309358665), (-14, 26.665158313)],
                knots=[0.295193876, 0.295193876, 0.295193876, 0.3125, 0.3125, 0.369027345, 0.369027345, 0.369027345], degree=2))
            Line((-16, 25.500081295), (-16, 13))
            Line((-16, 13), (-14, 13))
            Line((-14, 13), (-14, 26.665158313))
        make_face()
        with BuildLine():
            add(Edge.make_bspline(
                [(-11, 27.449991893), (-10.502604415, 27.499972357), (-10, 27.5), (-9.497679153, 27.500027628), (-9, 27.449990782)],
                knots=[0.468123874, 0.468123874, 0.468123874, 0.5, 0.5, 0.531893743, 0.531893743, 0.531893743], degree=2))
            Line((-11, 27.449991893), (-11, 13))
            Line((-11, 13), (-9, 13))
            Line((-9, 13), (-9, 27.449990782))
        make_face()
        with BuildLine():
            add(Edge.make_bspline(
                [(-6, 26.665174873), (-5.18532936, 26.309778717), (-4.44429767, 25.814696123), (-4.217478567, 25.663158488), (-4, 25.500105578)],
                knots=[0.6309785, 0.6309785, 0.6309785, 0.6875, 0.6875, 0.704819748, 0.704819748, 0.704819748], degree=2))
            Line((-6, 26.665174873), (-6, 13))
            Line((-6, 13), (-4, 13))
            Line((-4, 13), (-4, 25.500105578))
        make_face()
        with BuildLine():
            add(Edge.make_bspline(
                [(-4, -25.500081295), (-4.217420401, -25.663083528), (-4.44429767, -25.814696123), (-5.184524344, -26.309358665), (-6, -26.665158313)],
                knots=[0.295193876, 0.295193876, 0.295193876, 0.3125, 0.3125, 0.369027345, 0.369027345, 0.369027345], degree=2))
            Line((-4, -25.500081295), (-4, -13))
            Line((-4, -13), (-6, -13))
            Line((-6, -13), (-6, -26.665158313))
        make_face()
        with BuildLine():
            add(Edge.make_bspline(
                [(-9, -27.449991893), (-9.497395585, -27.499972357), (-10, -27.5), (-10.502320847, -27.500027628), (-11, -27.449990782)],
                knots=[0.468123874, 0.468123874, 0.468123874, 0.5, 0.5, 0.531893743, 0.531893743, 0.531893743], degree=2))
            Line((-9, -27.449991893), (-9, -13))
            Line((-9, -13), (-11, -13))
            Line((-11, -13), (-11, -27.449990782))
        make_face()
        with BuildLine():
            add(Edge.make_bspline(
                [(-14, -26.665174873), (-14.81467064, -26.309778717), (-15.55570233, -25.814696123), (-15.782521433, -25.663158488), (-16, -25.500105578)],
                knots=[0.6309785, 0.6309785, 0.6309785, 0.6875, 0.6875, 0.704819748, 0.704819748, 0.704819748], degree=2))
            Line((-14, -26.665174873), (-14, -13))
            Line((-14, -13), (-16, -13))
            Line((-16, -13), (-16, -25.500105578))
        make_face()
        with Locations((-5, -6)):
            Rectangle(VENT1_2_OUTLINE_W, VENT1_2_OUTLINE_H)
        with Locations((-10, -6)):
            Rectangle(VENT1_2_OUTLINE_W, VENT1_2_OUTLINE_H)
        with Locations((-15, -6)):
            Rectangle(VENT1_2_OUTLINE_W, VENT1_2_OUTLINE_H)
        with Locations((-5, 6)):
            Rectangle(VENT1_2_OUTLINE_W, VENT1_2_OUTLINE_H)
        with Locations((-10, 6)):
            Rectangle(VENT1_2_OUTLINE_W, VENT1_2_OUTLINE_H)
        with Locations((-15, 6)):
            Rectangle(VENT1_2_OUTLINE_W, VENT1_2_OUTLINE_H)
    extrude(amount=VENT1_2_DEPTH, mode=Mode.SUBTRACT)


solid = part.part
